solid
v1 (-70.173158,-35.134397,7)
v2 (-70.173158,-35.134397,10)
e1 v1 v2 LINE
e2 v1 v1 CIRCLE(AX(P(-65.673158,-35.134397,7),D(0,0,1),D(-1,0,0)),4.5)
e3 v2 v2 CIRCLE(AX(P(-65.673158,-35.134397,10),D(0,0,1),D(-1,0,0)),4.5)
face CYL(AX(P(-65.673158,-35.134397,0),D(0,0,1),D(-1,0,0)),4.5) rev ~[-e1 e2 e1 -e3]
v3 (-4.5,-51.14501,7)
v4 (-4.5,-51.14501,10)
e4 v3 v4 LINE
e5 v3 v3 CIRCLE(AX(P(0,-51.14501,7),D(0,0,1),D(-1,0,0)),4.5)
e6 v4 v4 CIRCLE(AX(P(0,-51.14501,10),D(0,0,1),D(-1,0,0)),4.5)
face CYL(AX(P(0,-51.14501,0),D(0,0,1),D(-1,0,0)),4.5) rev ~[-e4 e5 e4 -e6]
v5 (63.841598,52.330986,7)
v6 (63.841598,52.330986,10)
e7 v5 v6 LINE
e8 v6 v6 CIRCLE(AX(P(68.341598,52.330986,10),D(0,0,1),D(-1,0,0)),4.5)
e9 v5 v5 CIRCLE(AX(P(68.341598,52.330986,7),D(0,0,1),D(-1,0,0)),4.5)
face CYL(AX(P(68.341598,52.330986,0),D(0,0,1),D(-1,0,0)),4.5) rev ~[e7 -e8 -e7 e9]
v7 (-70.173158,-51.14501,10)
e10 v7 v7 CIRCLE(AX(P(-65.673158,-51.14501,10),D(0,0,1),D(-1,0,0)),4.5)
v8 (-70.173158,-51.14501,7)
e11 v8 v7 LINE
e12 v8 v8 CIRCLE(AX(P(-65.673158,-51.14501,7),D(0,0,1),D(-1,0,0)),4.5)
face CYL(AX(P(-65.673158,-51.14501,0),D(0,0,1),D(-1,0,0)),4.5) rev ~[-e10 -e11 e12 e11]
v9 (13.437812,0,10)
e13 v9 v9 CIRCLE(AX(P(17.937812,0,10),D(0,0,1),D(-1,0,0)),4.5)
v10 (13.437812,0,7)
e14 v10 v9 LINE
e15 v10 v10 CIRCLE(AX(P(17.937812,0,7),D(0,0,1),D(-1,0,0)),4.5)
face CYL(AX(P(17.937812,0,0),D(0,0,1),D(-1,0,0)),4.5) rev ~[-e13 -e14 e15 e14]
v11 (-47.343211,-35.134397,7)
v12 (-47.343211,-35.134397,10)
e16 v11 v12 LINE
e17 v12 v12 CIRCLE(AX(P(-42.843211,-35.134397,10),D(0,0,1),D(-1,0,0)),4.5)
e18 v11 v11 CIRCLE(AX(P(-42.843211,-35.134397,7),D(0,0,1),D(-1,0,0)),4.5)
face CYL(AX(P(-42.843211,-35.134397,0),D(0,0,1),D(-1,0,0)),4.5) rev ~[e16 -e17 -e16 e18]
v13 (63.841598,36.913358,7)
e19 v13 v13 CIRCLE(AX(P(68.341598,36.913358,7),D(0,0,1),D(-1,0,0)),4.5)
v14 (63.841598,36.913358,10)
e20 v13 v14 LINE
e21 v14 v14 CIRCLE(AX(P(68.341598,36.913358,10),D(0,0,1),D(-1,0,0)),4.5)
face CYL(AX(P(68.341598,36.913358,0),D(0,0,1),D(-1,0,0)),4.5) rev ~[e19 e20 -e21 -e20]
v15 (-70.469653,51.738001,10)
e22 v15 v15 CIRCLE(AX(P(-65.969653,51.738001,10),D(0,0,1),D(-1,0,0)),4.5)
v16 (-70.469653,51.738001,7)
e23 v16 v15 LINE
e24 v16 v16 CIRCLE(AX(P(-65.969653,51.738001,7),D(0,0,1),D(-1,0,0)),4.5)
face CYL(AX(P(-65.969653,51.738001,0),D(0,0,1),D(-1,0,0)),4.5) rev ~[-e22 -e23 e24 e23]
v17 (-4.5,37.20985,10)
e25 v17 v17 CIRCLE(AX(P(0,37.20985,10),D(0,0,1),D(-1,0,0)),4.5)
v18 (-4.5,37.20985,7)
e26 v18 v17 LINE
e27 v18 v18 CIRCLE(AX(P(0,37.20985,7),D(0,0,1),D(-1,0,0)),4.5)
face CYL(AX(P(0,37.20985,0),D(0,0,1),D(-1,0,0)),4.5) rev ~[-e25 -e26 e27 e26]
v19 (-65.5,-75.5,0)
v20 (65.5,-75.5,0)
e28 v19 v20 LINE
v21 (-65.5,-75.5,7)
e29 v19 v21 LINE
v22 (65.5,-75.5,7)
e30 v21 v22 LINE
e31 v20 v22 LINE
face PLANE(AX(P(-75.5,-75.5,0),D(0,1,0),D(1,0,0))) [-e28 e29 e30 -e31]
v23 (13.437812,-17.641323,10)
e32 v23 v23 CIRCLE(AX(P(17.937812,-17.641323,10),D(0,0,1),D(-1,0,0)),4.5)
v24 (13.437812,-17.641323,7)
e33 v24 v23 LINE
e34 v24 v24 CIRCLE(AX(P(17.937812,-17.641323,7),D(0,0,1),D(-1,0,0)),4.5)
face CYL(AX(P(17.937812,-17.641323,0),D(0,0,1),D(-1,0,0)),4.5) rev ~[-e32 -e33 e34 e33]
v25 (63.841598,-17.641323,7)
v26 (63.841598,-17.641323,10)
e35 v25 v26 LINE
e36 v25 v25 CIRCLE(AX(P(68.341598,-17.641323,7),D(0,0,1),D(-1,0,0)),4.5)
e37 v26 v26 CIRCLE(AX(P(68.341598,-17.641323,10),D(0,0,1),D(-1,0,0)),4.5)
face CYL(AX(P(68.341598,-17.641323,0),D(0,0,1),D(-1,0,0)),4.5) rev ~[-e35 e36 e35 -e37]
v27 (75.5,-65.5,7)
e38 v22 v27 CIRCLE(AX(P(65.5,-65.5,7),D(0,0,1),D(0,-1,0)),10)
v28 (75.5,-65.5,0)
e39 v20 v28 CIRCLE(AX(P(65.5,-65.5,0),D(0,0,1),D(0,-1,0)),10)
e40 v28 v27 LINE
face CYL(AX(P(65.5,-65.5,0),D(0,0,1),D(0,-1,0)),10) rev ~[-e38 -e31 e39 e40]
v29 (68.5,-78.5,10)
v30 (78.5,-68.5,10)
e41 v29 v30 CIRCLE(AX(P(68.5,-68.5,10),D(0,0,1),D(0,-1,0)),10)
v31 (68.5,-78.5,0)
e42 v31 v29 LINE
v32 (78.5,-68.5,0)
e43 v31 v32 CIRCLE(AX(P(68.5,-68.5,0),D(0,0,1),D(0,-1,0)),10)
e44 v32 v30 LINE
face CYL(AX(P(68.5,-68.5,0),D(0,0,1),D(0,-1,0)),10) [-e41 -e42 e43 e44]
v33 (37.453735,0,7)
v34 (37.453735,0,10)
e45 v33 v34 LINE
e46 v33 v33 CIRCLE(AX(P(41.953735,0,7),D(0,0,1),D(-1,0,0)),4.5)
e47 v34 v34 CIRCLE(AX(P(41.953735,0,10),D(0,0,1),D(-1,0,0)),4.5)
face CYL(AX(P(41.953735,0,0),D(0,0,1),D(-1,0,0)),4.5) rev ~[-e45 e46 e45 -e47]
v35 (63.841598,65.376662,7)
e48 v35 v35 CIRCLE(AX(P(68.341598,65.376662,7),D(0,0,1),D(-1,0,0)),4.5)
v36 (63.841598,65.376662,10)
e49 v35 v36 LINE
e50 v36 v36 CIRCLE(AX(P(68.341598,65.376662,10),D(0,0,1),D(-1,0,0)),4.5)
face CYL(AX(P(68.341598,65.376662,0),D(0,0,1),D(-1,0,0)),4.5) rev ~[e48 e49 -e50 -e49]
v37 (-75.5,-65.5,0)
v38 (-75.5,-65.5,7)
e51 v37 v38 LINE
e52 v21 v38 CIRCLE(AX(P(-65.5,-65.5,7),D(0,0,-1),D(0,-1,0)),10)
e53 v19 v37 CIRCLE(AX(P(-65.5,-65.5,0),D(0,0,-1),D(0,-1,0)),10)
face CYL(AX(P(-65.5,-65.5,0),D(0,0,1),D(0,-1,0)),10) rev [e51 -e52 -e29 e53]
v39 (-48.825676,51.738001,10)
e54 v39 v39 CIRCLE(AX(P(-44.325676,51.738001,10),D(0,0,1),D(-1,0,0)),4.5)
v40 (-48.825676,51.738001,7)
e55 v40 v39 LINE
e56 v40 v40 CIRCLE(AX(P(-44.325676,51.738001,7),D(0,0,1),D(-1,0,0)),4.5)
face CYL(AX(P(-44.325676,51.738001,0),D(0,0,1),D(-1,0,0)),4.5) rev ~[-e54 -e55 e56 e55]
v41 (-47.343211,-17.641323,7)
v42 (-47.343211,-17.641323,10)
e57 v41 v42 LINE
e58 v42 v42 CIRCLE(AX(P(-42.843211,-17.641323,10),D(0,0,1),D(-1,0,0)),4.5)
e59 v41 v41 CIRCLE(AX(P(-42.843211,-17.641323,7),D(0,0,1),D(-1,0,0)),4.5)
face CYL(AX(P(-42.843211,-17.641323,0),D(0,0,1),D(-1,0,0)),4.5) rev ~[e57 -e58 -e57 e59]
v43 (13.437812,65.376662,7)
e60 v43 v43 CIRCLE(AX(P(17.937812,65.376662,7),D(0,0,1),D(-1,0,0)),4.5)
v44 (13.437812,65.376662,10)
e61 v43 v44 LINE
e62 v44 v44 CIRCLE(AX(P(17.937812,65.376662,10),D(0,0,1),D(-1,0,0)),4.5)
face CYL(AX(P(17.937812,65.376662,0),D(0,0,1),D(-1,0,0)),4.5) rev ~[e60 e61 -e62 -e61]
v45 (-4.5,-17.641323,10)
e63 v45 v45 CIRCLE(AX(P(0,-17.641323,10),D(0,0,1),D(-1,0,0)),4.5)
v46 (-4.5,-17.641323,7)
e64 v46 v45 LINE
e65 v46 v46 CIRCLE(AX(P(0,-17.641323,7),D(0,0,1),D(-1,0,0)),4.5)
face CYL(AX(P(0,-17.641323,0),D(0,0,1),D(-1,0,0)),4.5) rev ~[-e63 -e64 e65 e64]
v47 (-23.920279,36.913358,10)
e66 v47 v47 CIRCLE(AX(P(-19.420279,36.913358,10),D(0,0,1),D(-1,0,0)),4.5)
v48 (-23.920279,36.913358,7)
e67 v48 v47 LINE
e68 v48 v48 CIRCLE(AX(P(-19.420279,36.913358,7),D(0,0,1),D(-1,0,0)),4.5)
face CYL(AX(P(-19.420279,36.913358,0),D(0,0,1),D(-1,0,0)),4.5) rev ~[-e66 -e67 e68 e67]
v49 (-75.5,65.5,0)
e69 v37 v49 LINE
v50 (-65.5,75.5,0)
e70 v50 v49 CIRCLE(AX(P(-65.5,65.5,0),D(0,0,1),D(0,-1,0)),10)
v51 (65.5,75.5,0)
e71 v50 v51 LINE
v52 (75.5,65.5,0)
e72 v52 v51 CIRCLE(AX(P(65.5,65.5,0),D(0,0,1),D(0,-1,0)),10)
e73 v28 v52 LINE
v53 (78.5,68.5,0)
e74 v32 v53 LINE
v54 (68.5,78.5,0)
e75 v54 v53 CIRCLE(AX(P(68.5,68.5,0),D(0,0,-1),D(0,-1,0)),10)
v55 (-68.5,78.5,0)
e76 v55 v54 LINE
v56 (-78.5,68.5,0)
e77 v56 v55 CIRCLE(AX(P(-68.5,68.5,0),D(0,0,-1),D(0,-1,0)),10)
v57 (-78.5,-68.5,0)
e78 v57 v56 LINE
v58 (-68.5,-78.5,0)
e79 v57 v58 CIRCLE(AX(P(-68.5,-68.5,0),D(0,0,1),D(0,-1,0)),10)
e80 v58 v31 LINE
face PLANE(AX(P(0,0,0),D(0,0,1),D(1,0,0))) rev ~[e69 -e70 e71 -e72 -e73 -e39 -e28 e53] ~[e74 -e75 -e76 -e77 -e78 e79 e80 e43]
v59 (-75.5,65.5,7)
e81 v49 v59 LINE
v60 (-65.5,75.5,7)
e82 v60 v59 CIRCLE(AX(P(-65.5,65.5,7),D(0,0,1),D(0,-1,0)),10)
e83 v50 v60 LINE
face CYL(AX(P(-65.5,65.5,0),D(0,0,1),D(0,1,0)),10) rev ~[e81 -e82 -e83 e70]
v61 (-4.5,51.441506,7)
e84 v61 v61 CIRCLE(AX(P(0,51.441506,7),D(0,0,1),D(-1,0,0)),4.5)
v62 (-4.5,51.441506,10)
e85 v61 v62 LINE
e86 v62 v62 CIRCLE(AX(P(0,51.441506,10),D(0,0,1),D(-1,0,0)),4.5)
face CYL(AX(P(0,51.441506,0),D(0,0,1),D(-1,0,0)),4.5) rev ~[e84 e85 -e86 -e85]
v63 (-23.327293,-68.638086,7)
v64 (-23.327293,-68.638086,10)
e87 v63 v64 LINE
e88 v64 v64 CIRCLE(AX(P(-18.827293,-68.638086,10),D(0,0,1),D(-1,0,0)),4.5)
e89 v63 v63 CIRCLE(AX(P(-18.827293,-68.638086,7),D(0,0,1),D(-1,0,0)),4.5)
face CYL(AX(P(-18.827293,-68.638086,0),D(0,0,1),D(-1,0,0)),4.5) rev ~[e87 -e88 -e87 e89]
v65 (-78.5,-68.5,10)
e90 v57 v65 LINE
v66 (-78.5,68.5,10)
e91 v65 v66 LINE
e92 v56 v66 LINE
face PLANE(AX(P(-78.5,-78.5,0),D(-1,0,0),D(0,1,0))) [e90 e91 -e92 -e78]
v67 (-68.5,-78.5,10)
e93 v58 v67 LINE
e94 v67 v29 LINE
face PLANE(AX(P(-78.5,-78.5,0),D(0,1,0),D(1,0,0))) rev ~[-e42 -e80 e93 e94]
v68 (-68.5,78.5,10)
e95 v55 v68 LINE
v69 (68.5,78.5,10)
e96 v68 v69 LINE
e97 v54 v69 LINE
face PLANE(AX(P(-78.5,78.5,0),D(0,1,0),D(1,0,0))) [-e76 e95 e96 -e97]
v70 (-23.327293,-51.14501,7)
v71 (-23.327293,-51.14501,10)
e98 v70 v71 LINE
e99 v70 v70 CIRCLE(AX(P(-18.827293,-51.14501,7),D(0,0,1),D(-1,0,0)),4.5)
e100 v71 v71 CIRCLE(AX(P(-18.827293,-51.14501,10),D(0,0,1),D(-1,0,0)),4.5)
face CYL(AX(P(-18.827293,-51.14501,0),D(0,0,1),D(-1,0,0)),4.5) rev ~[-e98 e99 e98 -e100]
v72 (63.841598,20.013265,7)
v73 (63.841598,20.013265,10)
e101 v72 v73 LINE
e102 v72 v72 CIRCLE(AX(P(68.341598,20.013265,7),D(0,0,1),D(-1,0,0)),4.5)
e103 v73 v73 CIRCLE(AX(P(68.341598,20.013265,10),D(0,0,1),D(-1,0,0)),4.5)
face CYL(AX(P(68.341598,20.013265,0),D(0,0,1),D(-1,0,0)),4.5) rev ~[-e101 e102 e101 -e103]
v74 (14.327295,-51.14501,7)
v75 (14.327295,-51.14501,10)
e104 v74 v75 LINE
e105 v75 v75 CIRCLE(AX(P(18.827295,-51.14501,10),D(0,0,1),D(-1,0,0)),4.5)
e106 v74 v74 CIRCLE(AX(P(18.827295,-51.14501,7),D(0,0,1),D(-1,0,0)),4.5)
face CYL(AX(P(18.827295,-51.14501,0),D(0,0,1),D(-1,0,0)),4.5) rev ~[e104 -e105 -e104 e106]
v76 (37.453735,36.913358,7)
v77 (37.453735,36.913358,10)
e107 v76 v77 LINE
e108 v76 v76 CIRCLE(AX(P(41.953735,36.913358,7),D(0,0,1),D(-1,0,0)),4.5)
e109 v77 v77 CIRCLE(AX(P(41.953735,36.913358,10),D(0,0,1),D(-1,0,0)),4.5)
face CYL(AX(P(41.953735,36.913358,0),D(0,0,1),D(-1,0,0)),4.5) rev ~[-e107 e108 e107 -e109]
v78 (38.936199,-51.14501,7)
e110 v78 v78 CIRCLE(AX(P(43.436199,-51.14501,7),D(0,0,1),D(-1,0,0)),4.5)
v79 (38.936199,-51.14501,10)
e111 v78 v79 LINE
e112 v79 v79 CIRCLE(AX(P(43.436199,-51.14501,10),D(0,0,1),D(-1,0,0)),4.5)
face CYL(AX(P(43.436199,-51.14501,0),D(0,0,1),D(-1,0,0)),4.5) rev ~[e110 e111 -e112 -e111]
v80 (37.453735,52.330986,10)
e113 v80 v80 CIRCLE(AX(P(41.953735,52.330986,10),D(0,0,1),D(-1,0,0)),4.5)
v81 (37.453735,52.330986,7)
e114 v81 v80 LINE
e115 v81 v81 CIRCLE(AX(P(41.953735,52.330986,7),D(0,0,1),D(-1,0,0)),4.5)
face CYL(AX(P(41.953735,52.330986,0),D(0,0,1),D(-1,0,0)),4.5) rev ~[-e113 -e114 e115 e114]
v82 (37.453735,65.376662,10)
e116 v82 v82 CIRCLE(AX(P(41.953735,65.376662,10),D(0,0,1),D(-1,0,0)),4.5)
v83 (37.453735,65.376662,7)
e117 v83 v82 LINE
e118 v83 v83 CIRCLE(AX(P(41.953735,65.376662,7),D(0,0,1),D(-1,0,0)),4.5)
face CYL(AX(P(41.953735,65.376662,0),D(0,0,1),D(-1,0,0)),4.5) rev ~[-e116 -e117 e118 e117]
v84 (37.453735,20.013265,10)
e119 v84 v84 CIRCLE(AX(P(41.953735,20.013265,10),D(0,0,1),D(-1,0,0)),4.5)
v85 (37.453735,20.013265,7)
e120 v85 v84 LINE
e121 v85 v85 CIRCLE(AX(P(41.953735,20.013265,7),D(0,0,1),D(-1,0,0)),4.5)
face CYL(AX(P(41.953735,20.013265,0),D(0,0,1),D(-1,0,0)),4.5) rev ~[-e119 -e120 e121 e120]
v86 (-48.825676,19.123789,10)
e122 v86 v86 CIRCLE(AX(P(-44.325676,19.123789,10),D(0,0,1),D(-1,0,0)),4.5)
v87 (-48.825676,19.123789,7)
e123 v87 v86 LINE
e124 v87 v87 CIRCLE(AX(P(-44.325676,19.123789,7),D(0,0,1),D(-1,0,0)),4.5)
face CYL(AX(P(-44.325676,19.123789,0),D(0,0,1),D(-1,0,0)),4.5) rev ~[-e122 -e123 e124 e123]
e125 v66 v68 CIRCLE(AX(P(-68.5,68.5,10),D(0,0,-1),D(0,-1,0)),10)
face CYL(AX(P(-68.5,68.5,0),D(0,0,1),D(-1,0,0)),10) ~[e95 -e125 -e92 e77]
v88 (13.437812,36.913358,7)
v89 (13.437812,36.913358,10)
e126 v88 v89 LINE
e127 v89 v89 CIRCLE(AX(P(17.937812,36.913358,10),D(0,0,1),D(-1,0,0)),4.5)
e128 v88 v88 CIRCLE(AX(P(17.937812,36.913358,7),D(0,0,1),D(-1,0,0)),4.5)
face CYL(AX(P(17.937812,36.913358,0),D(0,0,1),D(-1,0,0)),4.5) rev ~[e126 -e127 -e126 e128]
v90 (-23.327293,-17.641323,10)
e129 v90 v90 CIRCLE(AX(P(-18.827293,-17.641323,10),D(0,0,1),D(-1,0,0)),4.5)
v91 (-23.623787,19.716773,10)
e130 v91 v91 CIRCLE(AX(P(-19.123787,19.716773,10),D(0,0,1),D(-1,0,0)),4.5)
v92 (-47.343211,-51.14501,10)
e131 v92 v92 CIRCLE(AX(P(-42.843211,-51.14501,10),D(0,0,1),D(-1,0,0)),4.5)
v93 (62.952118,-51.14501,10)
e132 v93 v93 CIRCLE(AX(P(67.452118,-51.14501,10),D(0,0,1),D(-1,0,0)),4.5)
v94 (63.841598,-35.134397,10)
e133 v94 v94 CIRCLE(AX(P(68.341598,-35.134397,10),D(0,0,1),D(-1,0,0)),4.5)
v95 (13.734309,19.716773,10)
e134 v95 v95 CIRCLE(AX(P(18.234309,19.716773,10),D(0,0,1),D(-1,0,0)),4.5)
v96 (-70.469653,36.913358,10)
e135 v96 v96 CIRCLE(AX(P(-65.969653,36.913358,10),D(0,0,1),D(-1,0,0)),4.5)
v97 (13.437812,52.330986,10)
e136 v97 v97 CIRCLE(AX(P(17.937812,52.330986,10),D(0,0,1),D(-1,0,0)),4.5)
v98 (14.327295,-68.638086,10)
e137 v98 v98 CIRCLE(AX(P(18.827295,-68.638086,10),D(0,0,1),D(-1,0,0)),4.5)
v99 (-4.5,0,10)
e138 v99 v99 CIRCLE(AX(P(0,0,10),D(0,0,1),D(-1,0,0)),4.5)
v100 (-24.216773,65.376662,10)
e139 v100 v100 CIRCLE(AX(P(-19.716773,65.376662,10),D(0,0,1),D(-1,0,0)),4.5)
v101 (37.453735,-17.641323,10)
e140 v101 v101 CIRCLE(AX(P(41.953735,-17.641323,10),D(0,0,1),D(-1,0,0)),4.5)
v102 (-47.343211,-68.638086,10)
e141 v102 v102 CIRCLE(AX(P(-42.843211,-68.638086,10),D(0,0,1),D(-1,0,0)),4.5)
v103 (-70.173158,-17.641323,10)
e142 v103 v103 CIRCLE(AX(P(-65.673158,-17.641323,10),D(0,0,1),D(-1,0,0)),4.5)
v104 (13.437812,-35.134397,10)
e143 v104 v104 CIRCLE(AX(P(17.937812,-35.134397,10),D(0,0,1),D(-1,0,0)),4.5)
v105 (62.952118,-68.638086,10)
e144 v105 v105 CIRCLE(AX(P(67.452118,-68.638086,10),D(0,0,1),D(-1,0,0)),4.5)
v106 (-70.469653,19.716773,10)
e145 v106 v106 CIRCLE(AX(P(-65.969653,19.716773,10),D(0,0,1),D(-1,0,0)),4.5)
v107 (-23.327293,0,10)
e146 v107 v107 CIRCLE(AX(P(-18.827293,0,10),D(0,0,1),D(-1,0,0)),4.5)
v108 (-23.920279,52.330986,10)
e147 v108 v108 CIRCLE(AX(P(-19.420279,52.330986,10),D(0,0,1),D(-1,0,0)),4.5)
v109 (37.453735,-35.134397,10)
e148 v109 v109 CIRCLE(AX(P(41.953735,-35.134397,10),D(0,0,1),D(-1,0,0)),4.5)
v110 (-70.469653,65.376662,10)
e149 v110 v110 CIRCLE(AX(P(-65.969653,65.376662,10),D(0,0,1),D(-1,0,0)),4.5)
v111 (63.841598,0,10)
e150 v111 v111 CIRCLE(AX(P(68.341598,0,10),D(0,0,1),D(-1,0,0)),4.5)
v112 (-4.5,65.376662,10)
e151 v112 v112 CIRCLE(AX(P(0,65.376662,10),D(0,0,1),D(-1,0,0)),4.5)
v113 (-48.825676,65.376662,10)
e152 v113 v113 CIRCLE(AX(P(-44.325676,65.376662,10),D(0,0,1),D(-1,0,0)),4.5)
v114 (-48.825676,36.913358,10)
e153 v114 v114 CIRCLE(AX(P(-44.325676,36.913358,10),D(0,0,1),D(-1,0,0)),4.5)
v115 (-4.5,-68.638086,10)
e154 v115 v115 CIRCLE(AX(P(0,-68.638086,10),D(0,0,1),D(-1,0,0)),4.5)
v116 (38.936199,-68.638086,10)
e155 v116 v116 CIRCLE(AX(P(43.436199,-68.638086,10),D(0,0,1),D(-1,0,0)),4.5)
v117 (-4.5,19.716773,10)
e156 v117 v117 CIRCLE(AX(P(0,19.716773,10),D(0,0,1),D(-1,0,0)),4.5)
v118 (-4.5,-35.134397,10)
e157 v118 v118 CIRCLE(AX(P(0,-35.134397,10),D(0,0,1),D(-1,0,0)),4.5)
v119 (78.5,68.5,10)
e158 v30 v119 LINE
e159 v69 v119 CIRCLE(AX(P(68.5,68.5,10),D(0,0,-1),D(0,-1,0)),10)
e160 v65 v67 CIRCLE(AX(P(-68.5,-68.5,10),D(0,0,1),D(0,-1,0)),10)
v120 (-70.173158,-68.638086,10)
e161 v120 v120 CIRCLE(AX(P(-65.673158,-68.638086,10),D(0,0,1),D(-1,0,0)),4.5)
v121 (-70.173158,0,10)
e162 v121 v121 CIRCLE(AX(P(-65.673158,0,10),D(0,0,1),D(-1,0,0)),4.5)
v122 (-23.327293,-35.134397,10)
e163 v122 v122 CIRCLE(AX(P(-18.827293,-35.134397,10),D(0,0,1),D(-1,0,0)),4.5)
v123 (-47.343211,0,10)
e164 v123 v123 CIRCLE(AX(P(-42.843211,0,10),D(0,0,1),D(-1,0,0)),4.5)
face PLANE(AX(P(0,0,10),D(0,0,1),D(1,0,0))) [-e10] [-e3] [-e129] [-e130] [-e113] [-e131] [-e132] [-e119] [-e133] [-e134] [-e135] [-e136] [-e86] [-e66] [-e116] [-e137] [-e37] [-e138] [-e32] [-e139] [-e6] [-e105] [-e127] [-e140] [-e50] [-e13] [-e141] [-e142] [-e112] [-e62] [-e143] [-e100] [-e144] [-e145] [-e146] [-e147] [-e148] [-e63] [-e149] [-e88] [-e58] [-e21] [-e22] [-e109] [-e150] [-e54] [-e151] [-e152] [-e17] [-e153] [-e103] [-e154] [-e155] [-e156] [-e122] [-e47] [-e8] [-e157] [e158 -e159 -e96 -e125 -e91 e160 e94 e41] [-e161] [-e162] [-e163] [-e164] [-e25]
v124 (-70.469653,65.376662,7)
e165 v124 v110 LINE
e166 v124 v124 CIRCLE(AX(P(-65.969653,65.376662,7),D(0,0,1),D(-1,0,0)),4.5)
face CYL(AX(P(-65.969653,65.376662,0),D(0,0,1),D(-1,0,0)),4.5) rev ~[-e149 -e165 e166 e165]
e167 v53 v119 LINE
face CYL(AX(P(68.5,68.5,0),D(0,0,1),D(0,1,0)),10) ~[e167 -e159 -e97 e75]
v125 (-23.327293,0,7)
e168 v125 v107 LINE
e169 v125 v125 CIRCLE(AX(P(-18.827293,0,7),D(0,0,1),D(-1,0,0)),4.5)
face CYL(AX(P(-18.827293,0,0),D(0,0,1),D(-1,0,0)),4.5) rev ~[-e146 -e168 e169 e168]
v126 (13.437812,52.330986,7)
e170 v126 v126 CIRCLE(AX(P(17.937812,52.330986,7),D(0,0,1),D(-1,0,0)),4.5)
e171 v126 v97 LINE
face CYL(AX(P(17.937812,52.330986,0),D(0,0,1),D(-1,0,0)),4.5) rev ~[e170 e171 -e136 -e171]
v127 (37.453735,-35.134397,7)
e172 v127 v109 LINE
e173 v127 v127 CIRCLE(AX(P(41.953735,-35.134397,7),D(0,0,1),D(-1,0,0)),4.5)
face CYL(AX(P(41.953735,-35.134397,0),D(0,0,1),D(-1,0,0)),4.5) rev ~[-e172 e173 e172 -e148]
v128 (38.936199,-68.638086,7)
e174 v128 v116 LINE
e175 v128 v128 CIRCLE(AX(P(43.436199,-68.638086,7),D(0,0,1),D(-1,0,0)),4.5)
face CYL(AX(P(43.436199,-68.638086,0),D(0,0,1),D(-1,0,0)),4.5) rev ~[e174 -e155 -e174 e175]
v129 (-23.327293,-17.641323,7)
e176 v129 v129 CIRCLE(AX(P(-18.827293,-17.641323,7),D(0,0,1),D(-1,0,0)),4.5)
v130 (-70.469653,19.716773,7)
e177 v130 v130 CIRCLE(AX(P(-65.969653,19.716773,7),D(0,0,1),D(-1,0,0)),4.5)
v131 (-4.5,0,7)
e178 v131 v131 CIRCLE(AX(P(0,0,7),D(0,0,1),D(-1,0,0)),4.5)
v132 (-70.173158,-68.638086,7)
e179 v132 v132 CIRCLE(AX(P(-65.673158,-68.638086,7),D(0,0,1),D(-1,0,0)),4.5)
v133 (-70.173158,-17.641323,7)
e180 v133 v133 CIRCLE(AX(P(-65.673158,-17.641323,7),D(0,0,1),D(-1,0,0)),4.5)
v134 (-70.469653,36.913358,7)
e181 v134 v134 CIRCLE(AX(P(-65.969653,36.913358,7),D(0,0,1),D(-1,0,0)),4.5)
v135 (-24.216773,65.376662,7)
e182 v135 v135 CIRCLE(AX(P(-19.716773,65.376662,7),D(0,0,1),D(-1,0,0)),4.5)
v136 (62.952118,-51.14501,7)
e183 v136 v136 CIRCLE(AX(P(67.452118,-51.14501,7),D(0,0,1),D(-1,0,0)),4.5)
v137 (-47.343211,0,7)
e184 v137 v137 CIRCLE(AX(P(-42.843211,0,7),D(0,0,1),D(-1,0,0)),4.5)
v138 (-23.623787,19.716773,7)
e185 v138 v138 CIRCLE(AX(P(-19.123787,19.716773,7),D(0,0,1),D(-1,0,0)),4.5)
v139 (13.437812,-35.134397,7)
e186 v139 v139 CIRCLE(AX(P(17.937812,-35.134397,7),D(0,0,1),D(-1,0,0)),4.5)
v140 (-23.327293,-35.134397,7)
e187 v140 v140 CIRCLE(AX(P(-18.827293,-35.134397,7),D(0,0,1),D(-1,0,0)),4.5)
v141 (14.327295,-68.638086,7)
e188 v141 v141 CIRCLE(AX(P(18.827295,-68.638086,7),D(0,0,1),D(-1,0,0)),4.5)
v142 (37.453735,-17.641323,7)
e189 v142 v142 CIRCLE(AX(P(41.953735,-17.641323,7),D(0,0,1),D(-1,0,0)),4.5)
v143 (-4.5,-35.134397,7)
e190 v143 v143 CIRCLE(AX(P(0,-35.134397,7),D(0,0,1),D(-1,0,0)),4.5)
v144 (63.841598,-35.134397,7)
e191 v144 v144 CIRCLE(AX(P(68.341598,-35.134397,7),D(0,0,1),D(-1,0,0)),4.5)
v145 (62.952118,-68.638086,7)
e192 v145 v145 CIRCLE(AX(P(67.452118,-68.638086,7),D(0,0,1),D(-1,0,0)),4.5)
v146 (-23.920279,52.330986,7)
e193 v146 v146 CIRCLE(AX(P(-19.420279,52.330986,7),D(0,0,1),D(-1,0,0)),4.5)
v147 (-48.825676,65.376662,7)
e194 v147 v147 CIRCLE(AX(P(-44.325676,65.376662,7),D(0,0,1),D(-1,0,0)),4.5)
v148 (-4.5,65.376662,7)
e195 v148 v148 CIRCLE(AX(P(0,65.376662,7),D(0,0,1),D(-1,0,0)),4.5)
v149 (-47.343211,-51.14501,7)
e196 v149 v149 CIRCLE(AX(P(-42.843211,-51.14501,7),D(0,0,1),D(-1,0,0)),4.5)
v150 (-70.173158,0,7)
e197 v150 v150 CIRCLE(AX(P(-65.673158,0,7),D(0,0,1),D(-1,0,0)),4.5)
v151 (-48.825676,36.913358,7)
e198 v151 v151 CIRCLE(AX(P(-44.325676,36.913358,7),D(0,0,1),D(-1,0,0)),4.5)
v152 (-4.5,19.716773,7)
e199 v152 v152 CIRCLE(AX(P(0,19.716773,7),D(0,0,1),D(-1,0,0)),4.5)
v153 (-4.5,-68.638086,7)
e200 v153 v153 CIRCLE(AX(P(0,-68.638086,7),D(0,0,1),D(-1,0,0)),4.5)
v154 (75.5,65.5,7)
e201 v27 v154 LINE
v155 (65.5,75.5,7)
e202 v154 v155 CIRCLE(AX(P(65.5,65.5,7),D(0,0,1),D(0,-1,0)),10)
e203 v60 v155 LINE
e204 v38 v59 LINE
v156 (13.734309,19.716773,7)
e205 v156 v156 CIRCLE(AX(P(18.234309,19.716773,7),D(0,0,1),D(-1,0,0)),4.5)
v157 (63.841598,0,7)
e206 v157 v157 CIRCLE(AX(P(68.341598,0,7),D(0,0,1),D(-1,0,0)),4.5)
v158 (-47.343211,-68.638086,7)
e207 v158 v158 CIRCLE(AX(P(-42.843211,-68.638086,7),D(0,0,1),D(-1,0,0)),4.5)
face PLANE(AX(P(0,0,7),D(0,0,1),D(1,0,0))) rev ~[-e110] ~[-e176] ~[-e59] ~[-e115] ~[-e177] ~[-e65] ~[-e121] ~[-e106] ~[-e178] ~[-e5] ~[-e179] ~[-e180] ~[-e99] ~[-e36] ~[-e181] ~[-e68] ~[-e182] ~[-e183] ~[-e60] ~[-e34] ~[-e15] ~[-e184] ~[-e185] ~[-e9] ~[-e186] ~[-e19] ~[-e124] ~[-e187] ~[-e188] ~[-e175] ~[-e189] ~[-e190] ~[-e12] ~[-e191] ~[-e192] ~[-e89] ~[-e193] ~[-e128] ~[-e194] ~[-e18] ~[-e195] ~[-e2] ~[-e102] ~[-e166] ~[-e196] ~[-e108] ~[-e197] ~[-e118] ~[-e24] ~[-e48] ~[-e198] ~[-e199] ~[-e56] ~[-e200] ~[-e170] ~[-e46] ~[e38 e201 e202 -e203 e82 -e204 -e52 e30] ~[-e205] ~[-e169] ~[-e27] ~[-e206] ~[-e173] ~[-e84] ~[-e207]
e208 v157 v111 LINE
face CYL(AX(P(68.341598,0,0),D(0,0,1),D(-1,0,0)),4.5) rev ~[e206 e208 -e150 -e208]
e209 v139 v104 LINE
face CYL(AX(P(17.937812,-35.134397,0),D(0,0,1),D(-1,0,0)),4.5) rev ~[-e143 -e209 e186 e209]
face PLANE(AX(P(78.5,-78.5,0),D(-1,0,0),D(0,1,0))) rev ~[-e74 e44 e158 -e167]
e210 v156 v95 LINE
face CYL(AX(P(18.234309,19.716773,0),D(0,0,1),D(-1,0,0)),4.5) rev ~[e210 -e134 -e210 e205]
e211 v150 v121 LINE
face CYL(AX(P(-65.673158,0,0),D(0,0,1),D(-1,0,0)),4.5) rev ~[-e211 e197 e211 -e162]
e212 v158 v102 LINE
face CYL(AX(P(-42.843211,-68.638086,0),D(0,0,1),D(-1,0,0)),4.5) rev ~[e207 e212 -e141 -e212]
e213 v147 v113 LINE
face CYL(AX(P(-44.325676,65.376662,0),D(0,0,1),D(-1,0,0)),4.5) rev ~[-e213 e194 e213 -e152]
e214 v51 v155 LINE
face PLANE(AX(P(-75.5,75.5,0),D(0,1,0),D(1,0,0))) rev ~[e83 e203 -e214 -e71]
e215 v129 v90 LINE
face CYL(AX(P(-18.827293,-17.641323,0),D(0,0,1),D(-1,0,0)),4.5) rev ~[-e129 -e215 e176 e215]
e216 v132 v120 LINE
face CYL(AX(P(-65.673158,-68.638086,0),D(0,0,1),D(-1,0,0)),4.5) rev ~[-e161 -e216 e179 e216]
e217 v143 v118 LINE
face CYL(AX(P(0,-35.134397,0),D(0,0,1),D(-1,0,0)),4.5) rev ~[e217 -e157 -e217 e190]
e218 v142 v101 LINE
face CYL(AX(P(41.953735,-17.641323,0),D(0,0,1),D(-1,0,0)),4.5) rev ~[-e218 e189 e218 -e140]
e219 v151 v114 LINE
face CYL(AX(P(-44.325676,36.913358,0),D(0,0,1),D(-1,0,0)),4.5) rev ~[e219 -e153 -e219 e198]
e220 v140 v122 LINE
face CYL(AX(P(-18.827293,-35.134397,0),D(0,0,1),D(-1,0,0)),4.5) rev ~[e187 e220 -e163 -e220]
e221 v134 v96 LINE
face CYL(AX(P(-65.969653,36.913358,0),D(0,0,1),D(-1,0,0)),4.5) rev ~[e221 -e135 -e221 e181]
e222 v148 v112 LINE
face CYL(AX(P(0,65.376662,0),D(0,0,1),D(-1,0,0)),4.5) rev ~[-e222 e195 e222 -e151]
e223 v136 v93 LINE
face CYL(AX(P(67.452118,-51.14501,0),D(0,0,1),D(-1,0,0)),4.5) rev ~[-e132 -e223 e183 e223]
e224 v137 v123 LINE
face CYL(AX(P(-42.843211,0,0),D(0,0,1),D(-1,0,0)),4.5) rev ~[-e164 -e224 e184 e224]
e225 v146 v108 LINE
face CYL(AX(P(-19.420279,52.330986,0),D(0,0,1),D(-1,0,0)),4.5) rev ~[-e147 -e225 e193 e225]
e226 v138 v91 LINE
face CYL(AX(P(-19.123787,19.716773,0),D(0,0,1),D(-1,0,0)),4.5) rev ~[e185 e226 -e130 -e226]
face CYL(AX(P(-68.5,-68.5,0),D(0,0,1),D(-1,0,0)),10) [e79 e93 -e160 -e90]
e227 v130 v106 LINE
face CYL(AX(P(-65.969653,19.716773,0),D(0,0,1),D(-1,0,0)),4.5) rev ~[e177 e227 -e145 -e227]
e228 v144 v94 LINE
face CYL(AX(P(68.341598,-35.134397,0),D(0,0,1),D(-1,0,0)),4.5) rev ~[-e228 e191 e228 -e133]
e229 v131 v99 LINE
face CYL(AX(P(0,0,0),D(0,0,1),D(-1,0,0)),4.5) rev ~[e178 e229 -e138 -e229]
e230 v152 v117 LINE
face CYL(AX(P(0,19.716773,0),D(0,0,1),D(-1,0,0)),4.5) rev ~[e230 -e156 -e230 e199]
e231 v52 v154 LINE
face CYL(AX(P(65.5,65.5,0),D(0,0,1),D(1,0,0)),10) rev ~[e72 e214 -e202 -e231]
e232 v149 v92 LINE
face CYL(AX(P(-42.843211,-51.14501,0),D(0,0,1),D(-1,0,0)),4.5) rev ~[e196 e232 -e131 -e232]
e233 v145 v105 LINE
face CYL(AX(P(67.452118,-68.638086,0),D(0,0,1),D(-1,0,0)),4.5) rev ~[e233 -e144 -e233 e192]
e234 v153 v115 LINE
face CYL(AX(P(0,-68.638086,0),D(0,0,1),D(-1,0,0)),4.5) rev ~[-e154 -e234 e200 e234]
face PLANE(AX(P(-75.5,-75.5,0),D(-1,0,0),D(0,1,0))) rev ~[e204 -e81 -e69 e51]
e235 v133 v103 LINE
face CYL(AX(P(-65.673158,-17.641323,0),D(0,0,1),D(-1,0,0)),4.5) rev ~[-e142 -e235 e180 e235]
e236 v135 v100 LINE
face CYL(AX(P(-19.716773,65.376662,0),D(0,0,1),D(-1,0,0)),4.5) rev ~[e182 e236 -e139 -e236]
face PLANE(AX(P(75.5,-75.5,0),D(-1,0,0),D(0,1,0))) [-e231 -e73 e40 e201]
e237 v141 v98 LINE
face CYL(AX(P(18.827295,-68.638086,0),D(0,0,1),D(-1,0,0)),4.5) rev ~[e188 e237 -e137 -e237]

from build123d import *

# Parameters (mm, degrees)
F0_W           = 157
F0_H           = 157
F1_DEPTH       = 10
F2_W           = 151
F2_H           = 151
F3_DEPTH       = 7
F5_D           = 9
F5_CSINK_D     = 10
F5_CSINK_ANGLE = 90
F6_R           = 10
F7_R           = 10
F8_R           = 10


# Not quite as in the source:
# - a feature names something its author has since deleted; it is built from what else it names


with BuildPart() as f1:
    # F0 (on Top) → F1 (new body)
    with BuildSketch(Plane.XY):
        Rectangle(F0_W, F0_H)
    extrude(amount=F1_DEPTH)

    # F2 (on Top) → F3 (cut)
    with BuildSketch(Plane.XY):
        Rectangle(F2_W, F2_H)
    extrude(amount=F3_DEPTH, mode=Mode.SUBTRACT)

    # F5 (through all)
    with Locations(Plane(origin=(0, 0, 0), x_dir=(1, 0, 0), z_dir=(0, 0, -1))):
        with Locations((0, 0), (0, -19.7167731822), (0, -37.2098498046), (0, -51.4415055513), (0, -65.3766617179), (17.9378120229, 0), (41.9537350535, 0), (68.3415979147, 0), (-18.8272930682, 0), (-42.8432114422, 0), (-65.6731575727, 0), (0, 17.6413226873), (0, 35.1343974471), (0, 51.1450096965), (41.9537350535, -36.9133576751), (68.3415979147, -65.3766617179), (68.3415979147, -52.3309856653), (68.3415979147, -36.9133576751), (68.3415979147, -20.0132653117), (18.234308809, -19.7167731822), (17.9378120229, -36.9133576751), (41.9537350535, -52.3309856653), (41.9537350535, -65.3766617179), (17.9378120229, -52.3309856653), (-19.7167731822, -65.3766617179), (-65.9696534276, -65.3766617179), (17.9378120229, -65.3766617179), (41.9537350535, -20.0132653117), (-19.4202791899, -52.3309856653), (-19.4202791899, -36.9133576751), (-19.1237870604, -19.7167731822), (-65.9696534276, -19.7167731822), (-65.9696534276, -36.9133576751), (-65.9696534276, -51.7380014062), (-44.3256758153, -51.7380014062), (-44.3256758153, -36.9133576751), (-44.3256758153, -19.123788923), (-44.3256758153, -65.3766617179), (-65.6731575727, 68.638086319), (-65.6731575727, 51.1450096965), (-65.6731575727, 35.1343974471), (-65.6731575727, 17.6413226873), (-42.8432114422, 17.6413226873), (-42.8432114422, 35.1343974471), (-18.8272930682, 35.1343974471), (-18.8272930682, 17.6413226873), (-42.8432114422, 68.638086319), (-18.8272930682, 68.638086319), (-18.8272930682, 51.1450096965), (18.8272949308, 51.1450096965), (17.9378120229, 35.1343974471), (17.9378120229, 17.6413226873), (41.9537350535, 17.6413226873), (68.3415979147, 17.6413226873), (68.3415979147, 35.1343974471), (41.9537350535, 35.1343974471), (43.4361994267, 51.1450096965), (18.8272949308, 68.638086319), (0, 68.638086319), (43.4361994267, 68.638086319), (67.4521178007, 68.638086319), (67.4521178007, 51.1450096965), (-42.8432114422, 51.1450096965)):
            CounterSinkHole(F5_D / 2, F5_CSINK_D / 2, counter_sink_angle=F5_CSINK_ANGLE)

    # F6
    f6_edges = [f1.edges().sort_by_distance(p)[0] for p in [
        (78.5, 78.5, 5),
        (-78.5, 78.5, 5),
        (78.5, -78.5, 5),
    ]]
    fillet(f6_edges, radius=F6_R)

    # F7
    f7_edges = [f1.edges().sort_by_distance(p)[0] for p in [
        (-78.5, -78.5, 5),
    ]]
    fillet(f7_edges, radius=F7_R)

    # F8
    f8_edges = [f1.edges().sort_by_distance(p)[0] for p in [
        (75.5, -75.5, 3.5),
        (-75.5, -75.5, 3.5),
        (-75.5, 75.5, 3.5),
        (75.5, 75.5, 3.5),
    ]]
    fillet(f8_edges, radius=F8_R)


solid = f1.part
